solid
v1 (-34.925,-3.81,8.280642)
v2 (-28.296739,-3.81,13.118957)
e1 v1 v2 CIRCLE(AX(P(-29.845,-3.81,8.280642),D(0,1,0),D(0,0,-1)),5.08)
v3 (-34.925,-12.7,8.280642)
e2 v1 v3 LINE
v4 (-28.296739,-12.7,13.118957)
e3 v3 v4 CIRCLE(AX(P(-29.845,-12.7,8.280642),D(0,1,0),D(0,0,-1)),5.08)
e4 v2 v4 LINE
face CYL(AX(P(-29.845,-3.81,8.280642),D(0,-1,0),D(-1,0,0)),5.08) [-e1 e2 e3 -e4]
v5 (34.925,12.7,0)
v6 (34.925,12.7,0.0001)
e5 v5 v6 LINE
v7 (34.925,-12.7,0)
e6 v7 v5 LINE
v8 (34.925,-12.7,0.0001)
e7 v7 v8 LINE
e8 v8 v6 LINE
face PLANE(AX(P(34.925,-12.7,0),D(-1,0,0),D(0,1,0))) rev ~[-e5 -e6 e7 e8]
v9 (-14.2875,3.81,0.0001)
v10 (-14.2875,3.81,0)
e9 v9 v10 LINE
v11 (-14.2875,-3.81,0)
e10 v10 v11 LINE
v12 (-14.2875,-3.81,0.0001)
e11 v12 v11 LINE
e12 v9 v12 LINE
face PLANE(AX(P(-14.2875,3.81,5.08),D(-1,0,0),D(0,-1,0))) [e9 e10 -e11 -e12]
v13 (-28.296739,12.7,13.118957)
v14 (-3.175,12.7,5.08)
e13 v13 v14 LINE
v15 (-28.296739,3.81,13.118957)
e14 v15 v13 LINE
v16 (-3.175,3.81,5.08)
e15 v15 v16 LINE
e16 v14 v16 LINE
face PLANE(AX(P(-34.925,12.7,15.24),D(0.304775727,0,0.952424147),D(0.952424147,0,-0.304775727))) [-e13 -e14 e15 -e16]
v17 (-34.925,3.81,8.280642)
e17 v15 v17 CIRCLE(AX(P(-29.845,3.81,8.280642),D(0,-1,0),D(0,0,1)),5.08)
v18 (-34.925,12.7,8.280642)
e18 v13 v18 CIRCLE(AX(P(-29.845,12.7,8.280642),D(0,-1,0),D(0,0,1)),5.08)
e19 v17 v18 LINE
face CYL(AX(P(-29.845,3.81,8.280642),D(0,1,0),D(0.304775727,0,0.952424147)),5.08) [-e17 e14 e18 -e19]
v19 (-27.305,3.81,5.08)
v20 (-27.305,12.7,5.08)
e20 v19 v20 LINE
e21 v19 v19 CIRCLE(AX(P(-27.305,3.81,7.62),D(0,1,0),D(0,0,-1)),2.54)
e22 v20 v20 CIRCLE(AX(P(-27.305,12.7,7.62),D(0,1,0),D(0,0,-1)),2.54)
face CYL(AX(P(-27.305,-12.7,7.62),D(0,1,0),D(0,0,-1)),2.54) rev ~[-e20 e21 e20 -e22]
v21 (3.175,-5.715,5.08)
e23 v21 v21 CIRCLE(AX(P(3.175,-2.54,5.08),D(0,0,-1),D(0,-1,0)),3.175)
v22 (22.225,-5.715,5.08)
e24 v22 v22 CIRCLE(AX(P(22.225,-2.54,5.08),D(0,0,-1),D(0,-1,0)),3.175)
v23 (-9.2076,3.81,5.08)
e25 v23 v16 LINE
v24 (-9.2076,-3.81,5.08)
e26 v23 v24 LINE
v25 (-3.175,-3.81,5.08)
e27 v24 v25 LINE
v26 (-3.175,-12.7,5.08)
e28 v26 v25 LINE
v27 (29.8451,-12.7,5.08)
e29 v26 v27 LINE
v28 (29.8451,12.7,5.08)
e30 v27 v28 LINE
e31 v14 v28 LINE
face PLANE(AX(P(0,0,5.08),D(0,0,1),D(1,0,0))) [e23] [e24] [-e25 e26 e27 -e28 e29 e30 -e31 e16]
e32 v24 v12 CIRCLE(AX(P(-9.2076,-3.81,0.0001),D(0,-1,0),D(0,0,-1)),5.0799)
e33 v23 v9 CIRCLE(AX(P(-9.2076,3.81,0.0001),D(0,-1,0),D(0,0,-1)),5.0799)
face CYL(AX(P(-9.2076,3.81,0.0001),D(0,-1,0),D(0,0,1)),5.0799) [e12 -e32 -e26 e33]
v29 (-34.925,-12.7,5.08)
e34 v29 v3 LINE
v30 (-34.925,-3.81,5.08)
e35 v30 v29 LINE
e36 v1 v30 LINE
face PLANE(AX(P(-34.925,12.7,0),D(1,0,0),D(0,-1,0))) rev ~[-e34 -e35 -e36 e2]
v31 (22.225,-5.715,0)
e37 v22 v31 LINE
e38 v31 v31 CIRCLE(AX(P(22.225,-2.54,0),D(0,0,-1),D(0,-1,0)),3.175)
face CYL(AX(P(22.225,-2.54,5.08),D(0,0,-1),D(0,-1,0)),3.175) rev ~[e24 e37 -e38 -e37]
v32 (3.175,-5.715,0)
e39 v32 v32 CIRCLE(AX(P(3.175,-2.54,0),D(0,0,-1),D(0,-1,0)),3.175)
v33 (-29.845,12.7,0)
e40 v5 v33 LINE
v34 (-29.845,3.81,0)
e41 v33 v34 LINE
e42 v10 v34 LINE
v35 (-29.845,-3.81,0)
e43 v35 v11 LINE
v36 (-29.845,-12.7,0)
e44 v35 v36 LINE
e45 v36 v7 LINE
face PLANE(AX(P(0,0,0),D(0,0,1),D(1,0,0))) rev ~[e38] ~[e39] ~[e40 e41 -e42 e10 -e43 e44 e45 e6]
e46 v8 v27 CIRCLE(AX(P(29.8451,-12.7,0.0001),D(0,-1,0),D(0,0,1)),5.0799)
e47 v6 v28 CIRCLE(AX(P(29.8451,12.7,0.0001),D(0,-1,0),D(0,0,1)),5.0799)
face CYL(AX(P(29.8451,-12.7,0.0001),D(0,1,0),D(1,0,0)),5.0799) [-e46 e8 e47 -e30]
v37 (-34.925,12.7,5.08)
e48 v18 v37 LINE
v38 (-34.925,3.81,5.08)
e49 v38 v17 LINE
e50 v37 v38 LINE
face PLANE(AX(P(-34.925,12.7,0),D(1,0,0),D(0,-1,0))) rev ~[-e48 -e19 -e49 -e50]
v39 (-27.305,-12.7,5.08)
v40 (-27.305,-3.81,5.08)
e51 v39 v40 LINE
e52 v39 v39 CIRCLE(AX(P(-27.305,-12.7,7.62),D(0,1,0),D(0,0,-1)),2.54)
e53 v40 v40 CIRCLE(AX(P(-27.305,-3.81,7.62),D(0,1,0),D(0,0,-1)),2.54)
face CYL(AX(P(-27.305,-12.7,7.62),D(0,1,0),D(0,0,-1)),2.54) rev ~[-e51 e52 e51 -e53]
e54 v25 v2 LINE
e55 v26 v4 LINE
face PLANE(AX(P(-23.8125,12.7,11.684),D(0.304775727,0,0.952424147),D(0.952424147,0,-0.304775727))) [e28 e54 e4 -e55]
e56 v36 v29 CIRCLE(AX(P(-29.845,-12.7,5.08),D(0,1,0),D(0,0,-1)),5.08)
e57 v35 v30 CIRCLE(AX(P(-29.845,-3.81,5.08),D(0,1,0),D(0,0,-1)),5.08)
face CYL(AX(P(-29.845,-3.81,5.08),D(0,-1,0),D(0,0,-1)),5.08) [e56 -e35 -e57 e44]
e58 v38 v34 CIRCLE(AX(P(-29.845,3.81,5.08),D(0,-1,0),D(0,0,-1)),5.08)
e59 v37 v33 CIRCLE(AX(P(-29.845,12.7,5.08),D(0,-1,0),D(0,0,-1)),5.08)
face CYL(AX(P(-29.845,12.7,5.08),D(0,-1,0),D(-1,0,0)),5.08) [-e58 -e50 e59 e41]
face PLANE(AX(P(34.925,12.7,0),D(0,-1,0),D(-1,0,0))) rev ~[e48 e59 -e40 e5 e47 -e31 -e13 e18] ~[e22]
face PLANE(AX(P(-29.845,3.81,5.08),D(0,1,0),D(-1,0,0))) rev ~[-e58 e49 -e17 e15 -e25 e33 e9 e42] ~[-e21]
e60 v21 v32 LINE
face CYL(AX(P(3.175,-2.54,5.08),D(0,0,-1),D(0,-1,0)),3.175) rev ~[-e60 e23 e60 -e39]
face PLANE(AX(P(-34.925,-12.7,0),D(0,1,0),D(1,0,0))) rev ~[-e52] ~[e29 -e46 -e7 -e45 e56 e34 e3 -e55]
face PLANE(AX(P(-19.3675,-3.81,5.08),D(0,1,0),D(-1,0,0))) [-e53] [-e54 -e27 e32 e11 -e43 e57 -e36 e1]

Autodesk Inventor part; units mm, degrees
ref_plane "YZ Plane" through (0, 0, 0) normal (1, 0, 0) x (0, 1, 0)
ref_plane "XZ Plane" through (0, 0, 0) normal (0, 1, 0) x (-1, 0, 0)
ref_plane "XY Plane" through (0, 0, 0) normal (0, 0, 1) x (1, 0, 0)
sketch "Sketch1" plane through (0, 0, 0) normal (0, 0, 1) x (1, 0, 0)
  line L0 (-34.925, -12.7) -> (34.925, -12.7)
  line L1 (34.925, -12.7) -> (34.925, 12.7)
  line L2 (34.925, 12.7) -> (-34.925, 12.7)
  line L3 (-34.925, 12.7) -> (-34.925, -12.7)
  line L4 (-34.925, -12.7) -> (34.925, 12.7) construction
  line L5 (34.925, -12.7) -> (-34.925, 12.7) construction
  point P0 (0, 0)
  dimension "d0" = 25.4
  dimension "d1" = 69.85
extrude "Extrusion1" add sketch "Sketch1" along normal blind 5.08
sketch "Sketch2" plane through (0, 0, 5.08) normal (0, 0, 1) x (1, 0, 0)
  line L0 (-34.925, 12.7) -> (-34.925, -12.7) projected
  line L1 (34.925, -12.7) -> (34.925, 12.7) projected
  line L2 (34.925, 12.7) -> (-34.925, 12.7) projected
  point P0 (0, 0)
  point P1 (3.175, -2.54)
  point P2 (22.225, -2.54)
  dimension "d5" = 12.7
  dimension "d6" = 15.24
  dimension "d7" = 15.24
  dimension "d18" = 19.05
hole "Hole1" at (3.175, -2.54, 5.08) at (22.225, -2.54, 5.08) direction (0, 0, -1) diameter 6.35 end through all
sketch "Sketch5" plane through (0, 0, 5.08) normal (0, 0, 1) x (1, 0, 0)
  line L0 (34.925, 12.7) -> (-34.925, 12.7) projected
  line L1 (-34.925, 12.7) -> (-14.2875, 12.7)
  line L2 (-14.2875, 12.7) -> (-14.2875, 3.81)
  line L3 (-14.2875, 3.81) -> (-34.925, 3.81)
  line L4 (-34.925, 3.81) -> (-34.925, 12.7)
  line L5 (-34.925, 12.7) -> (-34.925, -12.7) projected
  line L6 (-34.925, -12.7) -> (-14.2875, -12.7)
  line L7 (-14.2875, -12.7) -> (-14.2875, -3.81)
  line L8 (-14.2875, -3.81) -> (-34.925, -3.81)
  line L9 (-34.925, -3.81) -> (-34.925, -12.7)
  point P0 (0, 0)
  dimension "d19" = 7.62
extrude "Extrusion2" add sketch "Sketch5" along normal blind 10.16
sketch "Sketch7" plane through (0, 0, 5.08) normal (0, 0, 1) x (1, 0, 0)
  line L0 (-29.845, 3.81) -> (-34.925, 3.81) projected
  line L1 (-19.3675, -3.81) -> (-14.2875, -3.81) projected
  line L2 (-34.925, 3.81) -> (-14.2875, 3.81)
  line L3 (-14.2875, 3.81) -> (-14.2875, -3.81)
  line L4 (-14.2875, -3.81) -> (-34.925, -3.81)
  line L5 (-34.925, -3.81) -> (-34.925, 3.81)
  point P0 (0, 0)
extrude "Extrusion4" cut sketch "Sketch7" against normal blind 12.7
fillet "Fillet2" radius 5.08 2 edges at (-34.925, 8.255, 0) (-34.925, -8.255, 0)
sketch "Sketch8" plane through (34.925, -12.7, 0) normal (0, -1, 0) x (1, 0, 0)
  line L0 (-69.85, 5.08) -> (-69.85, 15.24) projected
  line L1 (-64.77, 0) -> (0, 0) projected
  point P0 (-34.925, 0)
  point P1 (-62.23, 7.62)
  point P2 (-69.85, 10.16)
  dimension "d28" = 7.62
  dimension "d29" = 7.62
hole "Hole2" at (-27.305, -12.7, 7.62) direction (0, 1, 0) diameter 5.08 end through all
sketch "Sketch9" plane through (34.925, 12.7, 5.08) normal (0, 1, 0) x (1, 0, 0)
  line L0 (-49.2125, -10.16) -> (-69.85, -10.16) projected
  line L1 (-69.85, -10.16) -> (-38.1, 0)
  line L2 (-49.2125, 0) -> (0, 0) projected
  line L3 (-38.1, -10.16) -> (-38.1, 0)
  line L4 (-38.1, -10.16) -> (-69.85, -10.16)
  line L5 (-38.1, 0) -> (-58.7375, 0)
  line L6 (-58.7375, 0) -> (-58.7375, -6.604)
  point P0 (-34.925, 5.08)
extrude "Extrusion5" cut sketch "Sketch9" against normal through all contours L0 L1 L3 L4
extrude "Extrusion6" add sketch "Sketch9" against normal up to surface (8.89 mm away) contours L6 L5 L2 L1
fillet "Fillet3" radius 5.08 1 edges at (-34.925, 8.255, 15.24)
fillet "Fillet4" radius 5.08 1 edges at (-34.925, -8.255, 15.24)
extrude "Extrusion7" add sketch "Sketch9" along normal up to surface (8.89 mm away) from surface at -25.4 contours L6 L5 L2 L1
fillet "Fillet5" radius 5.08 1 edges at (34.925, 0, 5.08)
fillet "Fillet6" radius 5.08 1 edges at (-14.2875, 0, 5.08)
equation "\"d6\" = d7"
properties part number "Upper_Spring_Hanger"
